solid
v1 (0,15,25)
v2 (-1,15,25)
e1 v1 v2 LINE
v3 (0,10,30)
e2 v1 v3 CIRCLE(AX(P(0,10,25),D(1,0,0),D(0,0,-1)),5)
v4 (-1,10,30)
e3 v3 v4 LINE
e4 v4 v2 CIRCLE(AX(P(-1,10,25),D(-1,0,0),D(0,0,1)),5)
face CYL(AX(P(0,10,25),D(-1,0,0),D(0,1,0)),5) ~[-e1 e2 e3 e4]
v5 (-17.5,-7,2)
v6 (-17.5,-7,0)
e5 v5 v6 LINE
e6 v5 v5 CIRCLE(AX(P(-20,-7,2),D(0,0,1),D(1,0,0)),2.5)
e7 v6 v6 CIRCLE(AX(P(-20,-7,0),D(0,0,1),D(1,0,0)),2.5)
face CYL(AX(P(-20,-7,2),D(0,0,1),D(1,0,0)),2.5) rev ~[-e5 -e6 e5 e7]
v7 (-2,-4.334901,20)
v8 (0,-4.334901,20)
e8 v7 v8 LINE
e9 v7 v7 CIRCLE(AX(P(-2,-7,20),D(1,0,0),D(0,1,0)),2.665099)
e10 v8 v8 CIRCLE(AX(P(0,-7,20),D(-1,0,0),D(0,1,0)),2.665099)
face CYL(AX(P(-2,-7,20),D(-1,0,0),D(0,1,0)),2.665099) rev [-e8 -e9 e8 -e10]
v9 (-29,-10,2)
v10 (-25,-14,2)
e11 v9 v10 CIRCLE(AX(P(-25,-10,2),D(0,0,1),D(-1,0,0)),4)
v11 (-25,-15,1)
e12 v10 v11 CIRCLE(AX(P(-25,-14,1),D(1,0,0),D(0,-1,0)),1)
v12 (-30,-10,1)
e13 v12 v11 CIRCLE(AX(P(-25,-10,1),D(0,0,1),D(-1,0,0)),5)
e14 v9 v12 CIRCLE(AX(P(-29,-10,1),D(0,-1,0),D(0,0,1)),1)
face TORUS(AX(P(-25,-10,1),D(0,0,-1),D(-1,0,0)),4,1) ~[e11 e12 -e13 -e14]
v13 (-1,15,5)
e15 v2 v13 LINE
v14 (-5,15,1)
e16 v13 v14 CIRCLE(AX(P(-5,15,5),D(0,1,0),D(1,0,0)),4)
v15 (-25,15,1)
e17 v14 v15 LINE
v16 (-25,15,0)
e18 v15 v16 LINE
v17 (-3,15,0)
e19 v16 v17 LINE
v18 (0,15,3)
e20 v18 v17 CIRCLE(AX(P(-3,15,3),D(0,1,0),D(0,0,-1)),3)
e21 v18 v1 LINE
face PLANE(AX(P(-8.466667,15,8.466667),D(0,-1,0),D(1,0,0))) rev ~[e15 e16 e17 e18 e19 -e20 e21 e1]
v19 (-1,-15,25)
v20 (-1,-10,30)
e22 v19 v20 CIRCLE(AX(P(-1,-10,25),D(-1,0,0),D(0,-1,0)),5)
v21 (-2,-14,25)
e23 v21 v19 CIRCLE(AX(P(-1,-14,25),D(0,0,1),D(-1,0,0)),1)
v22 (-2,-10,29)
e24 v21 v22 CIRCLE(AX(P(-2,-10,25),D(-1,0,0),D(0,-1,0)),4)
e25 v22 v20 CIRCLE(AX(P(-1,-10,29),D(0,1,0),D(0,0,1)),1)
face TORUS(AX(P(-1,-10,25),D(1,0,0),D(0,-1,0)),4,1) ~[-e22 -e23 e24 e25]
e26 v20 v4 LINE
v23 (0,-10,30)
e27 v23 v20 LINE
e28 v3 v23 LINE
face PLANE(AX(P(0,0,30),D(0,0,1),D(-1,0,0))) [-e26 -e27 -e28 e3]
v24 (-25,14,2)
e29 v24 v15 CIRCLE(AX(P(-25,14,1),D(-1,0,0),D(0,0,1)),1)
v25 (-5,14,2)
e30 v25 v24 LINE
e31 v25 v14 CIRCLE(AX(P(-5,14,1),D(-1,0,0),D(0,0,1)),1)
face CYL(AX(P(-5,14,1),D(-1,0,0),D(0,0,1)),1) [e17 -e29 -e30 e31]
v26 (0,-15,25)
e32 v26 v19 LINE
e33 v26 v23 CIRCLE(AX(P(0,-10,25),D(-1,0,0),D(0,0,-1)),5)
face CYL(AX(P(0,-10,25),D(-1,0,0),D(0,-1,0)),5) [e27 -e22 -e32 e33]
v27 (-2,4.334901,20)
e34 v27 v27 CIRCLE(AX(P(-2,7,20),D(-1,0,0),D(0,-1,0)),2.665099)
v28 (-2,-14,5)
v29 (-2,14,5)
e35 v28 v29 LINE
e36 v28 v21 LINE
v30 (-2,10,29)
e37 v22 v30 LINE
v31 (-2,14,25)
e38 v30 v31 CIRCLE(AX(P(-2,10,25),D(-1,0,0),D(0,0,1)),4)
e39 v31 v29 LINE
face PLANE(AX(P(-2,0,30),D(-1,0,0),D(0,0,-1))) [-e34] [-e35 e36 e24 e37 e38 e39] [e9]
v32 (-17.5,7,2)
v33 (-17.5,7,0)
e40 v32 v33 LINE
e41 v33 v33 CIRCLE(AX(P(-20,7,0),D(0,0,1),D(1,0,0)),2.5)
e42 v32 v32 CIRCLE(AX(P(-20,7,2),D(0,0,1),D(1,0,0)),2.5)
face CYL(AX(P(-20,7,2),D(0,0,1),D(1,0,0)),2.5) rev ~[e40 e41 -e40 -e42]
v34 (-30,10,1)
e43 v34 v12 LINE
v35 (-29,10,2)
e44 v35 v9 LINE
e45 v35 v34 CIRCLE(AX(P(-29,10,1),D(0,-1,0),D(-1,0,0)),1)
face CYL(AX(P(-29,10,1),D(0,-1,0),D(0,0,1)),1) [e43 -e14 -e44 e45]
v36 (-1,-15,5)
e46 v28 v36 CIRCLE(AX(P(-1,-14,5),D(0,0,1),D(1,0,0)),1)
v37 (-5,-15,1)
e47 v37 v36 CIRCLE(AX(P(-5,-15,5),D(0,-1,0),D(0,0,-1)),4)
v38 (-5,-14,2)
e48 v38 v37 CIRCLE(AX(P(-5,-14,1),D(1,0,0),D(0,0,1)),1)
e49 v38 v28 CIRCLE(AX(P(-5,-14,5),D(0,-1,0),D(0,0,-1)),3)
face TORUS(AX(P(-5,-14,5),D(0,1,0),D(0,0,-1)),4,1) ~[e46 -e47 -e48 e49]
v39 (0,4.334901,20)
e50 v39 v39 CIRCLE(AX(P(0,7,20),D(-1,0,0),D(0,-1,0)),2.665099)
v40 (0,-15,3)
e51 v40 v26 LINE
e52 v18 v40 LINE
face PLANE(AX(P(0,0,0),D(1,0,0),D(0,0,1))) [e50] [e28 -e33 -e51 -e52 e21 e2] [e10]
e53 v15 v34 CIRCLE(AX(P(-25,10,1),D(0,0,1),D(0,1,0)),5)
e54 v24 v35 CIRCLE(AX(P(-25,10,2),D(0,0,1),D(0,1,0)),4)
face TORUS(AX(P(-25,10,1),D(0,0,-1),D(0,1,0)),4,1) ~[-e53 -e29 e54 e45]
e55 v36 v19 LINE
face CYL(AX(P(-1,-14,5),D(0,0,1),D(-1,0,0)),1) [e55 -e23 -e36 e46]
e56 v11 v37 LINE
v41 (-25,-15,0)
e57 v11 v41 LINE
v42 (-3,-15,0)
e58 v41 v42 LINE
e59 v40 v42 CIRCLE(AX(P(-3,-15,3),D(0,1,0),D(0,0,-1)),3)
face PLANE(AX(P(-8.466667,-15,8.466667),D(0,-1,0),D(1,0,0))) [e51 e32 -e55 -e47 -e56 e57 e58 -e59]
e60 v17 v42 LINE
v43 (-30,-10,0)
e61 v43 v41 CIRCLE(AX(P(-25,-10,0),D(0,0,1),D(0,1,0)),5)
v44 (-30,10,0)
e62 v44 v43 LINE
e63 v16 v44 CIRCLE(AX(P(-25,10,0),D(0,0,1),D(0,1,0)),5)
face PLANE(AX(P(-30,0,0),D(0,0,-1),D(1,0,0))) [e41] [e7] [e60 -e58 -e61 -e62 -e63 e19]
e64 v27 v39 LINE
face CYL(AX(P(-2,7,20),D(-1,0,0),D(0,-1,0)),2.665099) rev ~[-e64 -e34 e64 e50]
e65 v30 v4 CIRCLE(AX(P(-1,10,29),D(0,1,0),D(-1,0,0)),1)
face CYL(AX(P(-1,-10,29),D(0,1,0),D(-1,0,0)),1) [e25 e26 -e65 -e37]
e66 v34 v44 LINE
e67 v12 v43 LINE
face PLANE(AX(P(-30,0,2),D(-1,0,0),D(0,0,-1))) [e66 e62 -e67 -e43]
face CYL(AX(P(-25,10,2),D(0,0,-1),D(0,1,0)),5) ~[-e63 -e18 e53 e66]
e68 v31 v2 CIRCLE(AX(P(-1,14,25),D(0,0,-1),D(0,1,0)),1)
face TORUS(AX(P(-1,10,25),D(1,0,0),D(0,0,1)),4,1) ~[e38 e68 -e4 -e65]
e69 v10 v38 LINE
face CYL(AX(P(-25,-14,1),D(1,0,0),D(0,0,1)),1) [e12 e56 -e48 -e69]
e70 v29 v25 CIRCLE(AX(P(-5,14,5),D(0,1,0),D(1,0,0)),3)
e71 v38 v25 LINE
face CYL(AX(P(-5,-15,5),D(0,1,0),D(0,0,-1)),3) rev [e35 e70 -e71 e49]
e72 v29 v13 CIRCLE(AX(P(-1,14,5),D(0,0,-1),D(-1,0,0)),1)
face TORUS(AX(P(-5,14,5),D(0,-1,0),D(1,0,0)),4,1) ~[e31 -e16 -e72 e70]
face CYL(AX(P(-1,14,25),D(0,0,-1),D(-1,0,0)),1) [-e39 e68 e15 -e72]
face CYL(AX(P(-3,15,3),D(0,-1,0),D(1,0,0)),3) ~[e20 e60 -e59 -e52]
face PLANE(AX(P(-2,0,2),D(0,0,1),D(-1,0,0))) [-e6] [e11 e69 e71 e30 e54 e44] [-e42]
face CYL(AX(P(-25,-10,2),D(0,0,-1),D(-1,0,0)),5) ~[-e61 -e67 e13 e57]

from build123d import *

# Parameters (mm, degrees)
F1_DEPTH = 15
F2_R     = 3
F3_R     = 2.5
F4_DEPTH = 2.001
F5_R     = 5
F6_R     = 1
F7_R     = 2.6650989984
F8_DEPTH = 2.001


# Not quite as in the source:
# - a pattern or mirror of a feature is missing from the dataset's text; its kind, count and spacing are read off the source's solid


with BuildPart() as f1:
    # F0 (on Front) → F1 (new body, symmetric)
    with BuildSketch(Plane.XZ):
        Polygon((-30, 2), (-30, 0), (0, 0), (0, 30), (-2, 30), (-2, 2), align=None)
    extrude(amount=F1_DEPTH, both=True)

    # F2
    f2_edges = [f1.edges().sort_by_distance(p)[0] for p in [
        (0, 0, 0),
        (-2, 0, 2),
    ]]
    fillet(f2_edges, radius=F2_R)

    # F3 (on face) → F4 (cut, through all)
    with BuildSketch(Plane.XY.offset(2)):
        with Locations((-20, 7)):
            Circle(F3_R)
        with Locations((-20, -7)):
            Circle(F3_R)
    extrude(amount=-F4_DEPTH, mode=Mode.SUBTRACT)

    # F5
    f5_edges = [f1.edges().sort_by_distance(p)[0] for p in [
        (-30, -15, 1),
        (-30, 15, 1),
        (-1, -15, 30),
        (-1, 15, 30),
    ]]
    fillet(f5_edges, radius=F5_R)

    # F6
    f6_edges = [f1.edges().sort_by_distance(p)[0] for p in [
        (-15, 15, 2),
        (-28.535534, 13.535534, 2),
        (-30, 0, 2),
        (-15, -15, 2),
        (-28.535534, -13.535534, 2),
        (-2.87868, 15, 2.87868),
        (-2, 15, 15),
        (-2.87868, -15, 2.87868),
        (-2, -15, 15),
        (-2, 13.535534, 28.535534),
        (-2, 0, 30),
        (-2, -13.535534, 28.535534),
    ]]
    fillet(f6_edges, radius=F6_R)

    # F7 (on face) → F8 (cut, through all)
    with BuildSketch(Plane(origin=(-2, 0, 0), x_dir=(0, -1, 0), z_dir=(-1, 0, 0))):
        with Locations((-7, 20)):
            Circle(F7_R)
    f8 = extrude(amount=-F8_DEPTH, mode=Mode.SUBTRACT)

    # F8_copies: F8 across plane
    add(f8.mirror(Plane(origin=(0, 0, 0), x_dir=(0, 0, -1), z_dir=(0, -1, 0))), mode=Mode.SUBTRACT)


solid = f1.part
